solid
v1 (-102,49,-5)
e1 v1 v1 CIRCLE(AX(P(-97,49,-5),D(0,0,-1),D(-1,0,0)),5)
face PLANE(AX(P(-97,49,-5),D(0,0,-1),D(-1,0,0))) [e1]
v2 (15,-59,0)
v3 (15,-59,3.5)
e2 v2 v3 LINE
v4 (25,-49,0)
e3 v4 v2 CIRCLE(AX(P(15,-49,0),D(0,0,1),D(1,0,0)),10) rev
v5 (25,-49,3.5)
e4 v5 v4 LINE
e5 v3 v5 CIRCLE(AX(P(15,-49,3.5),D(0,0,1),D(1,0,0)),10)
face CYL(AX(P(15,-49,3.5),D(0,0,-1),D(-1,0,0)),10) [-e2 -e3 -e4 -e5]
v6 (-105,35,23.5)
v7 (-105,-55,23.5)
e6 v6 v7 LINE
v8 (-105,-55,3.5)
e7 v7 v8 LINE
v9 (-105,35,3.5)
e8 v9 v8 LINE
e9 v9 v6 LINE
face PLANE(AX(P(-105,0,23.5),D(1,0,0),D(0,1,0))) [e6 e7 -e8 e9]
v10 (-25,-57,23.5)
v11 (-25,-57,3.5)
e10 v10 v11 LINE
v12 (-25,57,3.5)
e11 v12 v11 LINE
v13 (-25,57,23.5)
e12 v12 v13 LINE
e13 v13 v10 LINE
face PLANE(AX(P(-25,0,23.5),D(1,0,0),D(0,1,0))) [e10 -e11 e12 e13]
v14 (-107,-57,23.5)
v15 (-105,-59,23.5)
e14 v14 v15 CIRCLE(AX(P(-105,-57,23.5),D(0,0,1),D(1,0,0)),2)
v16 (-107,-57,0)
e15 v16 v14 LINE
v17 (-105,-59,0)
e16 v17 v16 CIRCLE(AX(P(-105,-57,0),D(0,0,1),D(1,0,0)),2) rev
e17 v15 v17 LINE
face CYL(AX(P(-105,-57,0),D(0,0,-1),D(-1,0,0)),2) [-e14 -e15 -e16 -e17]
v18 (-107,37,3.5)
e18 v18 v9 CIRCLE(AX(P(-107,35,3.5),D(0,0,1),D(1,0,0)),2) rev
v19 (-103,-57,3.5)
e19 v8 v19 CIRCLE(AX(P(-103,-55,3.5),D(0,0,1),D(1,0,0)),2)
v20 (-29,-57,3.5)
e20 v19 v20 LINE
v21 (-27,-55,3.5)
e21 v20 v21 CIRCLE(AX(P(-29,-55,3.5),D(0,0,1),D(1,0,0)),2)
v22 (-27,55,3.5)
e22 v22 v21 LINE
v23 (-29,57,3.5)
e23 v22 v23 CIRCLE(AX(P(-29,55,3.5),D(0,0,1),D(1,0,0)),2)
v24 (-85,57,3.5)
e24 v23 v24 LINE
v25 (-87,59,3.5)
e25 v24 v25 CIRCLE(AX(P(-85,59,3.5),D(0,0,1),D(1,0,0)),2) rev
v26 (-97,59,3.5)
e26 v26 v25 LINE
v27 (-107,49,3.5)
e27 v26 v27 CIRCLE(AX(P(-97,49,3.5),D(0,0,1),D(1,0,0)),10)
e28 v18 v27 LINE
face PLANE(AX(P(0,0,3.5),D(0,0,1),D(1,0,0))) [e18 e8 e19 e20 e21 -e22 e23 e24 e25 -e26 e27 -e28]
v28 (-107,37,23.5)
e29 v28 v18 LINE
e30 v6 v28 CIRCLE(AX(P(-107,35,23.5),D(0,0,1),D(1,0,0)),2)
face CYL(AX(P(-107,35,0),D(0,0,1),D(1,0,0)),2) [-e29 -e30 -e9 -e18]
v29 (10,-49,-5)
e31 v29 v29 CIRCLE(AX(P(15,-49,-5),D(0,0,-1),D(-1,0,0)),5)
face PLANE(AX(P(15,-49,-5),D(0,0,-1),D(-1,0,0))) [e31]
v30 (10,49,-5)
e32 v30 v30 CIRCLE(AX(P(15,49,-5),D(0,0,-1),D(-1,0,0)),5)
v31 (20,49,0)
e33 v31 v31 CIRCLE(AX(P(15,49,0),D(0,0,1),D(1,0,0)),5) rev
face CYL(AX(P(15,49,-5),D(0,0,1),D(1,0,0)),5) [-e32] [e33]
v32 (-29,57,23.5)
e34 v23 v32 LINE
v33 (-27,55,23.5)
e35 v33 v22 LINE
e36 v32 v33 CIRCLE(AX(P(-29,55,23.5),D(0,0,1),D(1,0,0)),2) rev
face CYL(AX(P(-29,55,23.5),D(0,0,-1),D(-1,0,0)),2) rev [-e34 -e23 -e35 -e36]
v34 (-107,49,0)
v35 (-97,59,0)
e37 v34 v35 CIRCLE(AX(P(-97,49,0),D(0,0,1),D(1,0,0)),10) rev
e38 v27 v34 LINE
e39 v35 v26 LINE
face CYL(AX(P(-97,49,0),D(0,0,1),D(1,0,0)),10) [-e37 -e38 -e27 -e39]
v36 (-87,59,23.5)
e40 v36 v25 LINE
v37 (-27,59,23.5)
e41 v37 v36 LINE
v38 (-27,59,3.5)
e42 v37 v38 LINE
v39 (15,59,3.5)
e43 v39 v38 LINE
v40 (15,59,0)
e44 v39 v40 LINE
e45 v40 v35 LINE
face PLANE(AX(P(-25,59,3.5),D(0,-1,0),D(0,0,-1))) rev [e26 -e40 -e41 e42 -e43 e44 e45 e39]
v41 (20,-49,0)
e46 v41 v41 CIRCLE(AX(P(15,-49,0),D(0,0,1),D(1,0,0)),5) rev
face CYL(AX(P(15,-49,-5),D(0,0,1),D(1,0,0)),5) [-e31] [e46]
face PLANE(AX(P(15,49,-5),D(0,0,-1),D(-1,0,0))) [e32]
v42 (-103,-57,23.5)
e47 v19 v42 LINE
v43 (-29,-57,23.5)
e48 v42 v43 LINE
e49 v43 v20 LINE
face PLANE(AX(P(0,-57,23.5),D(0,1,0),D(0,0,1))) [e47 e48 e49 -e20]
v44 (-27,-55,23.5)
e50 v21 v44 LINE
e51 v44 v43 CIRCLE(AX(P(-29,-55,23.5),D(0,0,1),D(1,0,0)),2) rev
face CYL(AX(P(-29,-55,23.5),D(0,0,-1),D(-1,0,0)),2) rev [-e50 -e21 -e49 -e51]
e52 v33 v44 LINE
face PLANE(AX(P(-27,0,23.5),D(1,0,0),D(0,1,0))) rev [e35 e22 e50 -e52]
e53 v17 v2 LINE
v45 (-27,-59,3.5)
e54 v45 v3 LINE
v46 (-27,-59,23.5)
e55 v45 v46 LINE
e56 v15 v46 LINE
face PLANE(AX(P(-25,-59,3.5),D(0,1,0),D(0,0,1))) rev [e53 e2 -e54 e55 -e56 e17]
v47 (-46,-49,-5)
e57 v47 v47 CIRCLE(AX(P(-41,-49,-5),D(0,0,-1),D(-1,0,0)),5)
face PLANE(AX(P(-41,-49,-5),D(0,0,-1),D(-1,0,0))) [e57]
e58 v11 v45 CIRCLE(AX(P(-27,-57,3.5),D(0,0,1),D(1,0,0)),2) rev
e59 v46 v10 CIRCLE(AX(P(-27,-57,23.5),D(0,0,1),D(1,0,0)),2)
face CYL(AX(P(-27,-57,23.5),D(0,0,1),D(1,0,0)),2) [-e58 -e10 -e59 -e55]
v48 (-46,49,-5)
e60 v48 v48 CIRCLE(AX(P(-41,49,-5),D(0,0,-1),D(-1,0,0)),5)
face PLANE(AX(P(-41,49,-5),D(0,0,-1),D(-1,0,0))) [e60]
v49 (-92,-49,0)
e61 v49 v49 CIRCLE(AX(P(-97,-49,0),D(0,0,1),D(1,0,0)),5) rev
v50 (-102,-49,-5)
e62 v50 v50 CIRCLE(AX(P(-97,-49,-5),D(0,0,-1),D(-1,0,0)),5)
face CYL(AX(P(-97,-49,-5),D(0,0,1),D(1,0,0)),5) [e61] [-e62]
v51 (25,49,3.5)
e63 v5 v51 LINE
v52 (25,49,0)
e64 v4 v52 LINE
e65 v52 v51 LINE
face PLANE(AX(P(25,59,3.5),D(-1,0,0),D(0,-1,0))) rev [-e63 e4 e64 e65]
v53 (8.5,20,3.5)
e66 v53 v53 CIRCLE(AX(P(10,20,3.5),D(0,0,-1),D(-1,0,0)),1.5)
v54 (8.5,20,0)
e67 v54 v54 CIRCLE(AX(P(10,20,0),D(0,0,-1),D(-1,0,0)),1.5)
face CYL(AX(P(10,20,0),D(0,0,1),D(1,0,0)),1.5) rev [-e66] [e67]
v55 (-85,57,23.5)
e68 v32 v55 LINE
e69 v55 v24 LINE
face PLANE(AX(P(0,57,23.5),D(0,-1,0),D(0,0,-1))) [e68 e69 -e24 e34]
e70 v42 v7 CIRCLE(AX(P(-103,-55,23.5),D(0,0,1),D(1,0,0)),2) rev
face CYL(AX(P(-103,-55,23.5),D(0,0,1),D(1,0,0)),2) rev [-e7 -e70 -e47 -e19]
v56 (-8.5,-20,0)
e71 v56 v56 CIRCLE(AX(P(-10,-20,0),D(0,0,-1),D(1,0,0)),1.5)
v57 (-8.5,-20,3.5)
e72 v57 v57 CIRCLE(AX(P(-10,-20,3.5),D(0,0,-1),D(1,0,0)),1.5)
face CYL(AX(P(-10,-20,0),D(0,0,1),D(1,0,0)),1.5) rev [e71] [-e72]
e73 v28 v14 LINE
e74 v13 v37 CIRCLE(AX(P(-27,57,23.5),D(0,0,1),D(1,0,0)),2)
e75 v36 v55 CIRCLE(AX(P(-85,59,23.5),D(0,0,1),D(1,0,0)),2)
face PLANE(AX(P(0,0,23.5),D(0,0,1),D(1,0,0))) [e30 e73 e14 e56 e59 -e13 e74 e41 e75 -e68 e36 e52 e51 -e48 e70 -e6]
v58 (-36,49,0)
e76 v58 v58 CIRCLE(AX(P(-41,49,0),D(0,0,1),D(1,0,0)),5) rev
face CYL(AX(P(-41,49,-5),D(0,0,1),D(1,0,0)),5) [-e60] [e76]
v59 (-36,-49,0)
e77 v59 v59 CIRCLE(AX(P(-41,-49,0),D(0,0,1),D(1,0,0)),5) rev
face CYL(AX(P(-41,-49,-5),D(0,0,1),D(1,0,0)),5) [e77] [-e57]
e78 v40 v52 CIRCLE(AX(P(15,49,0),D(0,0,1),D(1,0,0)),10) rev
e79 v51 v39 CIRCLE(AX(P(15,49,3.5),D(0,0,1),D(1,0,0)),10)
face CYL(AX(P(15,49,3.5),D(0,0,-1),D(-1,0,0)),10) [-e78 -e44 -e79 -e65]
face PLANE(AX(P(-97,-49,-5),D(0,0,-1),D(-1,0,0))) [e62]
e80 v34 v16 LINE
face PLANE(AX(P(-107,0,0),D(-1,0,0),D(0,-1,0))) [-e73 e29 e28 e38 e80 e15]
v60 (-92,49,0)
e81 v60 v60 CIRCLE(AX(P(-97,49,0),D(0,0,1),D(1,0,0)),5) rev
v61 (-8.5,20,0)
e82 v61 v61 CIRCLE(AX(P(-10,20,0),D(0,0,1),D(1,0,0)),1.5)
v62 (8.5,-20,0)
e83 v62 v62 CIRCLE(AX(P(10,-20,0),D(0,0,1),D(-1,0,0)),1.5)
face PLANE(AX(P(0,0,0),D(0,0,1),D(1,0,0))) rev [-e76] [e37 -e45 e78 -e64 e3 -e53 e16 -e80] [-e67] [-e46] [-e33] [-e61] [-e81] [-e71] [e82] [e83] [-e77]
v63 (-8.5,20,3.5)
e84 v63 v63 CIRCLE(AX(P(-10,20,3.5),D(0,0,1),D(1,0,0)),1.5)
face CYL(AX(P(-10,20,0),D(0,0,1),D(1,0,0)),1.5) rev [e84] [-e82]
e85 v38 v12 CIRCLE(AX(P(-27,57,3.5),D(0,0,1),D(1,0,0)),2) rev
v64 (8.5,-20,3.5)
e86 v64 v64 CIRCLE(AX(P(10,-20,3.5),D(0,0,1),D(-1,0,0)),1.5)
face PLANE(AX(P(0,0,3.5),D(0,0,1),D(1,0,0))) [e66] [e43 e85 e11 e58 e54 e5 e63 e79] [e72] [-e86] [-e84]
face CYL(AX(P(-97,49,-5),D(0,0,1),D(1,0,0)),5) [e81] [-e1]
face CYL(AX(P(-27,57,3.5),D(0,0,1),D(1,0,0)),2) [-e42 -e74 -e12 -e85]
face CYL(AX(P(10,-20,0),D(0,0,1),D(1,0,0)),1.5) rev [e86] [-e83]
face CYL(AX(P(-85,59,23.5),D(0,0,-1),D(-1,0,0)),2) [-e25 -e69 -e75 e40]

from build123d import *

# Parameters (mm, degrees)
SKETCH_1_W                                 = 50
SKETCH_1_H                                 = 118
EXTRUDE_1_DEPTH                            = 3.5
SKETCH_3_R                                 = 1.5
CUT_EXTRUDE_1_DEPTH                        = 65.1735927
MIRROR_1_AT_THE_SECOND_PLANE_COPY_1_SKET_R = 1.5
MIRROR_1_AT_THE_SECOND_PLANE_COPY_1_DEPTH  = 65.1735927
SKETCH_4_W                                 = 3.5
SKETCH_4_H                                 = 118
EXTRUDE_2_DEPTH                            = 82
EXTRUDE_4_OUTLINE_W                        = 82
EXTRUDE_4_OUTLINE_H                        = 118
EXTRUDE_4_OUTLINE_W_2                      = 78
EXTRUDE_4_OUTLINE_H_2                      = 114
EXTRUDE_4_DEPTH                            = 20
SKETCH_6_W                                 = 2
SKETCH_6_H                                 = 20
SKETCH_6_W_2                               = 18
CUT_EXTRUDE_2_DEPTH                        = 20
SKETCH_7_W                                 = 18
SKETCH_7_H                                 = 20
SKETCH_7_W_2                               = 2
CUT_EXTRUDE_3_DEPTH                        = 20
FILLET_1_R                                 = 10
FILLET_2_R                                 = 2
FILLET_3_R                                 = 2
SKETCH_8_R                                 = 5
EXTRUDE_3_DEPTH                            = 5
SKETCH_9_R                                 = 5
EXTRUDE_4_2_DEPTH                          = 5


# Read off the part's stored shape, not the designer's step: 拉伸-薄壁4
with BuildPart() as part:
    # 草图1 → 凸台-拉伸1 (new body)
    with BuildSketch(Plane.XY):
        Rectangle(SKETCH_1_W, SKETCH_1_H)
    extrude(amount=EXTRUDE_1_DEPTH)

    # 草图3 → 切除-拉伸1 (cut, through all)
    with BuildSketch(Plane.XY.offset(3.5)):
        with Locations((-10, 20)):
            Circle(SKETCH_3_R)
    cut_extrude_1 = extrude(amount=-CUT_EXTRUDE_1_DEPTH, mode=Mode.SUBTRACT)

    # 镜向1: 切除-拉伸1 across plane
    add(cut_extrude_1.mirror(Plane(origin=(0, 0, 0), x_dir=(0, 0, 1), z_dir=(1, 0, 0))), mode=Mode.SUBTRACT)

    # 镜向1 at the second plane: 切除-拉伸1 across plane
    add(cut_extrude_1.mirror(Plane.ZX), mode=Mode.SUBTRACT)

    # 镜向1 at the second plane copy 1 sket → 镜向1 at the second plane copy 1 (cut, through all)
    with BuildSketch(Plane(origin=(0, 0, 3.5), x_dir=(-1, 0, 0), z_dir=(0, 0, 1))):
        with Locations((-10, 20)):
            Circle(MIRROR_1_AT_THE_SECOND_PLANE_COPY_1_SKET_R)
    extrude(amount=-MIRROR_1_AT_THE_SECOND_PLANE_COPY_1_DEPTH, mode=Mode.SUBTRACT)

    # 草图4 → 凸台-拉伸2 (add)
    with BuildSketch(Plane.ZY.offset(25)):
        with Locations((1.75, 0)):
            Rectangle(SKETCH_4_W, SKETCH_4_H)
    extrude(amount=EXTRUDE_2_DEPTH)

    # Extrude 4 outline → Extrude 4 (add)
    with BuildSketch(Plane.XY.offset(3.5)):
        with Locations((-66, 0)):
            Rectangle(EXTRUDE_4_OUTLINE_W, EXTRUDE_4_OUTLINE_H)
        with Locations((-66, 0)):
            Rectangle(EXTRUDE_4_OUTLINE_W_2, EXTRUDE_4_OUTLINE_H_2, mode=Mode.SUBTRACT)
    extrude(amount=EXTRUDE_4_DEPTH)

    # 草图6 → 切除-拉伸2 (cut)
    with BuildSketch(Plane.XZ.offset(-57)):
        with Locations((-106, 13.5)):
            Rectangle(SKETCH_6_W, SKETCH_6_H)
        with Locations((-96, 13.5)):
            Rectangle(SKETCH_6_W_2, SKETCH_6_H)
    extrude(amount=CUT_EXTRUDE_2_DEPTH, mode=Mode.SUBTRACT)

    # 草图7 → 切除-拉伸3 (cut)
    with BuildSketch(Plane.XZ.offset(-57)):
        with Locations((-96, 13.5)):
            Rectangle(SKETCH_7_W, SKETCH_7_H)
        with Locations((-106, 13.5)):
            Rectangle(SKETCH_7_W_2, SKETCH_7_H)
    extrude(amount=-CUT_EXTRUDE_3_DEPTH, mode=Mode.SUBTRACT)

    # 圆角1
    fillet_1_edges = [part.edges().sort_by_distance(p)[0] for p in [
        (25, -59, 1.75),
        (25, 59, 1.75),
        (-107, 59, 1.75),
    ]]
    fillet(fillet_1_edges, radius=FILLET_1_R)

    # 圆角2
    fillet_2_edges = [part.edges().sort_by_distance(p)[0] for p in [
        (-87, 57, 13.5),
        (-107, -59, 11.75),
        (-25, -59, 13.5),
        (-25, 59, 13.5),
        (-105, 37, 13.5),
    ]]
    fillet(fillet_2_edges, radius=FILLET_2_R - 0.0001)  # a hair under: the kernel refuses the full size

    # 圆角3
    fillet_3_edges = [part.edges().sort_by_distance(p)[0] for p in [
        (-27, 57, 13.5),
        (-105, -57, 13.5),
        (-27, -57, 13.5),
    ]]
    fillet(fillet_3_edges, radius=FILLET_3_R)

    # 草图8 → 凸台-拉伸3 (add)
    with BuildSketch(Plane(origin=(0, 0, 0), x_dir=(-1, 0, 0), z_dir=(0, 0, -1))):
        with Locations(Location((-15, 49, 0), (0, 0, 180))):
            Circle(SKETCH_8_R)
        with Locations(Location((97, 49, 0), (0, 0, 180))):
            Circle(SKETCH_8_R)
        with Locations(Location((-15, -49, 0), (0, 0, 180))):
            Circle(SKETCH_8_R)
        with Locations(Location((97, -49, 0), (0, 0, 180))):
            Circle(SKETCH_8_R)
    extrude(amount=EXTRUDE_3_DEPTH)

    # 草图9 → Extrude 4 2 (add)
    with BuildSketch(Plane(origin=(0, 0, 0), x_dir=(-1, 0, 0), z_dir=(0, 0, -1))):
        with Locations(Location((41, 49, 0), (0, 0, 180))):
            Circle(SKETCH_9_R)
        with Locations(Location((41, -49, 0), (0, 0, 180))):
            Circle(SKETCH_9_R)
    extrude(amount=EXTRUDE_4_2_DEPTH)


solid = part.part
